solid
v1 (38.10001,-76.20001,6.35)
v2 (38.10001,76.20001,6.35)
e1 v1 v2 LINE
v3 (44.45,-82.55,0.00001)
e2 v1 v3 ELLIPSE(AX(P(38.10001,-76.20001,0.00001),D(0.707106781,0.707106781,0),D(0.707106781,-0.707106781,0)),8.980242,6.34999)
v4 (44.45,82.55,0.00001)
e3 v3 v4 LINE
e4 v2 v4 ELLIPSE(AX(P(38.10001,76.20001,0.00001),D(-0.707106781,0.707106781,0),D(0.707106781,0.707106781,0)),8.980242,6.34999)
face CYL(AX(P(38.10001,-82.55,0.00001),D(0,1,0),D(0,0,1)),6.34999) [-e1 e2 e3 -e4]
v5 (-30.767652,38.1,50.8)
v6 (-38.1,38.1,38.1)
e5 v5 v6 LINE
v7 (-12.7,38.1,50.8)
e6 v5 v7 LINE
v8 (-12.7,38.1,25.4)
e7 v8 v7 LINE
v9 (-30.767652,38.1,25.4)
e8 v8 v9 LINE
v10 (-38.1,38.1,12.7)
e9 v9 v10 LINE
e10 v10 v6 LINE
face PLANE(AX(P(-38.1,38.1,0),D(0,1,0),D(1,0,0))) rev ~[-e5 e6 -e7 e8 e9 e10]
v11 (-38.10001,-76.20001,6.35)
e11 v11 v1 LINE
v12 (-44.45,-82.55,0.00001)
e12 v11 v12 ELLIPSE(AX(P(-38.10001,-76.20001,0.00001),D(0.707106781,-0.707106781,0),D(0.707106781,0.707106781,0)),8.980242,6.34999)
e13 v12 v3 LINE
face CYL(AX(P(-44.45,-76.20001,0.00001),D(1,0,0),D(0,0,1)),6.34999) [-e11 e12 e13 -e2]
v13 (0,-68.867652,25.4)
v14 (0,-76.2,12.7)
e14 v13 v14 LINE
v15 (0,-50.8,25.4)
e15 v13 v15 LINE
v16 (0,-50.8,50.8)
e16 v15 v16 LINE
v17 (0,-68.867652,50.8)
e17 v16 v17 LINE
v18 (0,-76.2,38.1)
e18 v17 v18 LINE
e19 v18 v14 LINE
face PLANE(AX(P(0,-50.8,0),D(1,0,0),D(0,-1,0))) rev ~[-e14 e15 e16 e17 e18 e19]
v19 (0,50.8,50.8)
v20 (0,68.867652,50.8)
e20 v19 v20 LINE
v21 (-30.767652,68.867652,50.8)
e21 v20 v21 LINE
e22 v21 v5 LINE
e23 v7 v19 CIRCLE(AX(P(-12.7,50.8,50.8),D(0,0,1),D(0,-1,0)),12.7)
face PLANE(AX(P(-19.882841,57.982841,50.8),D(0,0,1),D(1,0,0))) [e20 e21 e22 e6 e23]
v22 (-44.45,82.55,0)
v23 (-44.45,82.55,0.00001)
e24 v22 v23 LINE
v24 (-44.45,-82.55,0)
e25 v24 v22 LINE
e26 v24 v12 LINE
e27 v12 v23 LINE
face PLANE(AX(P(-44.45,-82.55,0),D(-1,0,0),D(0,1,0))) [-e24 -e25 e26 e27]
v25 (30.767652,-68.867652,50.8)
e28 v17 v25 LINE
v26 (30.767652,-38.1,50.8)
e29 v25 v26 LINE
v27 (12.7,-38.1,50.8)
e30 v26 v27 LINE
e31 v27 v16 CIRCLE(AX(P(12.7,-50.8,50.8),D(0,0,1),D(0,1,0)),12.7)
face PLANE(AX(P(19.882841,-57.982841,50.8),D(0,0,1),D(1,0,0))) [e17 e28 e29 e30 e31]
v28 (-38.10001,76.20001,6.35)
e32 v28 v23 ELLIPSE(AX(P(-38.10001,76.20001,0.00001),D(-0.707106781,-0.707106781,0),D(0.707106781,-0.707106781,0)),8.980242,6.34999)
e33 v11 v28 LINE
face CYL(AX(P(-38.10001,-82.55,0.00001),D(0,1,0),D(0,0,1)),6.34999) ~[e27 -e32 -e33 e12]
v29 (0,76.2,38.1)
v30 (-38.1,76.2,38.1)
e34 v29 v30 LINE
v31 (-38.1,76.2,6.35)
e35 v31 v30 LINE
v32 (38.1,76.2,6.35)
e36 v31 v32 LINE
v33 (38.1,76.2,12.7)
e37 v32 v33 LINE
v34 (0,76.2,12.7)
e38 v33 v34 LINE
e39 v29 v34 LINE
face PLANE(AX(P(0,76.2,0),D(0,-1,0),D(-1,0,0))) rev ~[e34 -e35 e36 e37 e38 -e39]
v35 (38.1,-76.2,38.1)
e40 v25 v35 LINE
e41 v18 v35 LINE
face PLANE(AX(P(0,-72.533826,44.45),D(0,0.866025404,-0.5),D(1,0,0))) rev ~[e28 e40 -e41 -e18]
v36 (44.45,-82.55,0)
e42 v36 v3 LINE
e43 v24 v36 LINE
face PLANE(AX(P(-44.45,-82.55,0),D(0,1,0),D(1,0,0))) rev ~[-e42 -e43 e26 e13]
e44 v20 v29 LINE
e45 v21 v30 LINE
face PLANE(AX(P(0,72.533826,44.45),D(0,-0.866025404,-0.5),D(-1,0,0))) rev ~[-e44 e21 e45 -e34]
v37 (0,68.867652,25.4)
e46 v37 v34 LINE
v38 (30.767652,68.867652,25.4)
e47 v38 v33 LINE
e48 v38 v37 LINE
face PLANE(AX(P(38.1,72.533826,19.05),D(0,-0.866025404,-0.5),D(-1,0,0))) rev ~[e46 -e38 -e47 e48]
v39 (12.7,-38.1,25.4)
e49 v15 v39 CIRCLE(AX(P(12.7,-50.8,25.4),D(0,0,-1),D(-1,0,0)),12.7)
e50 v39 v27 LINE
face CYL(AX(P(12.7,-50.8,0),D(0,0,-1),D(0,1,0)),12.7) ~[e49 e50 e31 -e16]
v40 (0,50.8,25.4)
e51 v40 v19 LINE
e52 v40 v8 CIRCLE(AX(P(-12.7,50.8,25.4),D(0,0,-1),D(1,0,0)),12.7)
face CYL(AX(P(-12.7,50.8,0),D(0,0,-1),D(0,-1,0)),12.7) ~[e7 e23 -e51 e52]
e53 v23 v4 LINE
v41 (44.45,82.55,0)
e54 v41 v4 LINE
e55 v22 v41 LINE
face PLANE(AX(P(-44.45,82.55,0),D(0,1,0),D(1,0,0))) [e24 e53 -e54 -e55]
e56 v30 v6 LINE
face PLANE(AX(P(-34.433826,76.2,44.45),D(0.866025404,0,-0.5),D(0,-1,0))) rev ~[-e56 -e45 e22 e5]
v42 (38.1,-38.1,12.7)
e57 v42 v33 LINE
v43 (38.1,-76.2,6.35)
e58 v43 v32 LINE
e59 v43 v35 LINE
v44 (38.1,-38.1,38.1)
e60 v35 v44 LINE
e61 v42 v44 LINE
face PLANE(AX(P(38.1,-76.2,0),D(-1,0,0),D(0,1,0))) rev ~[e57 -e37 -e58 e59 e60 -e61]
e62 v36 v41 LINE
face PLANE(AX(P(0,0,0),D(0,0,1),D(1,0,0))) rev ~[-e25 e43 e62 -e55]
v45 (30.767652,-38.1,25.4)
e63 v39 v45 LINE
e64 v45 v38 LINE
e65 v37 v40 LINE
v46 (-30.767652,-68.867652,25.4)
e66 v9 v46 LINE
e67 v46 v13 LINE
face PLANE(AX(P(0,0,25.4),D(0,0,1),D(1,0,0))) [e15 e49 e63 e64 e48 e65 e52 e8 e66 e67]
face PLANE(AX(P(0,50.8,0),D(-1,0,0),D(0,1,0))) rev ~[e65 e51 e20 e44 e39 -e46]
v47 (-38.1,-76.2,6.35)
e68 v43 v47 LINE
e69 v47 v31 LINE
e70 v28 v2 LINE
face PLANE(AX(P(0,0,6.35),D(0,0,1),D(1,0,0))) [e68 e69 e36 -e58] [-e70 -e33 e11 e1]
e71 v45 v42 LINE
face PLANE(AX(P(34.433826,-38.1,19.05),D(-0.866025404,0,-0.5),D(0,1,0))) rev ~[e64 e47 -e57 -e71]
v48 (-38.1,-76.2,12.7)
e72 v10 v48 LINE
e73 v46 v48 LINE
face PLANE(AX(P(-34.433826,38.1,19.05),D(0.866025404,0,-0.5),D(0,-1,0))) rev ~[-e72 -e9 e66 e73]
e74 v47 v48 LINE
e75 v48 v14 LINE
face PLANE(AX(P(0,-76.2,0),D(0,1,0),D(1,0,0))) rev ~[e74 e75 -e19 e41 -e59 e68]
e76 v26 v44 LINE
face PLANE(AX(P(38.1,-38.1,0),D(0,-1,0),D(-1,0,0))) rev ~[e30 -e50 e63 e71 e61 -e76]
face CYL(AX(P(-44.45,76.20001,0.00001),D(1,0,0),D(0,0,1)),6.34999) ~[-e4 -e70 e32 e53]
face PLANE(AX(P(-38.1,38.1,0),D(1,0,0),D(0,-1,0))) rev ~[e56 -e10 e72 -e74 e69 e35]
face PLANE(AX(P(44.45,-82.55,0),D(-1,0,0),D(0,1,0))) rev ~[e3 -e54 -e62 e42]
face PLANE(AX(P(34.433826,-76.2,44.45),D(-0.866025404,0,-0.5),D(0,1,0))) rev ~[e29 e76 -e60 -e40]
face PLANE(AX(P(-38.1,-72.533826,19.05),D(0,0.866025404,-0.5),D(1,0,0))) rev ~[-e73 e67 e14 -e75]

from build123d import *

# Parameters (mm, degrees)
F0_W     = 88.9
F0_H     = 165.1
F1_DEPTH = 6.35
F2_DEPTH = 25.4
F3_DEPTH = 50.8
F4_SIZE2 = 12.7
F4_SIZE  = 7.3323484187
F5_R     = 6.34999
F6_SIZE2 = 12.7
F6_SIZE  = 7.3323484187
F7_SIZE2 = 12.7
F7_SIZE  = 7.3323484187


# Not quite as in the source:
# - a fillet or chamfer is up to 0.001 mm smaller than in the source, because OpenCascade refuses the exact size


with BuildPart() as f1:
    # F0 (on Top) → F1 (new body)
    with BuildSketch(Plane.XY):
        Rectangle(F0_W, F0_H)
        Polygon((-38.1, 38.1), (-38.1, 76.2), (0, 76.2), (38.1, 76.2), (38.1, -38.1), (38.1, -76.2), (0, -76.2), (-38.1, -76.2), align=None, mode=Mode.SUBTRACT)
    extrude(amount=F1_DEPTH)

    # F0 (on Top) → F2 (join)
    with BuildSketch(Plane.XY):
        with BuildLine():
            Line((38.1, 76.2), (0, 76.2))
            Line((0, 76.2), (0, 50.8))
            ThreePointArc((0, 50.8), (-3.7197438789, 41.8197438789), (-12.7, 38.1))
            Line((-12.7, 38.1), (-38.1, 38.1))
            Line((-38.1, 38.1), (-38.1, -76.2))
            Line((-38.1, -76.2), (0, -76.2))
            Line((0, -76.2), (0, -50.8))
            ThreePointArc((0, -50.8), (3.7197438789, -41.8197438789), (12.7, -38.1))
            Line((12.7, -38.1), (38.1, -38.1))
            Line((38.1, -38.1), (38.1, 76.2))
        make_face()
    extrude(amount=F2_DEPTH)

    # F0 (on Top) → F3 (join)
    with BuildSketch(Plane.XY):
        with BuildLine():
            Line((38.1, -76.2), (38.1, -38.1))
            Line((38.1, -38.1), (12.7, -38.1))
            ThreePointArc((12.7, -38.1), (3.7197438789, -41.8197438789), (0, -50.8))
            Line((0, -50.8), (0, -76.2))
            Line((0, -76.2), (38.1, -76.2))
        make_face()
        with BuildLine():
            Line((0, 76.2), (-38.1, 76.2))
            Line((-38.1, 76.2), (-38.1, 38.1))
            Line((-38.1, 38.1), (-12.7, 38.1))
            ThreePointArc((-12.7, 38.1), (-3.7197438789, 41.8197438789), (0, 50.8))
            Line((0, 50.8), (0, 76.2))
        make_face()
    extrude(amount=F3_DEPTH)

    # F4
    f4_edges = [f1.edges().sort_by_distance(p)[0] for p in [
        (19.05, -76.2, 50.8),
        (38.1, -57.15, 50.8),
    ]]
    f4_side = f1.faces().sort_by_distance((19.446042, -57.546042, 50.8))[0]
    chamfer(f4_edges, length=F4_SIZE, length2=F4_SIZE2, reference=f4_side)

    # F5 (radius 6.35 in the source; OpenCascade refuses exactly that, so slightly less here)
    f5_edges = [f1.edges().sort_by_distance(p)[0] for p in [
        (0, -82.55, 6.35),
        (44.45, 0, 6.35),
        (0, 82.55, 6.35),
        (-44.45, 0, 6.35),
    ]]
    fillet(f5_edges, radius=F5_R)

    # F6
    f6_edges = [f1.edges().sort_by_distance(p)[0] for p in [
        (-19.05, 76.2, 50.8),
        (-38.1, 57.15, 50.8),
    ]]
    f6_side = f1.faces().sort_by_distance((-19.446042, 57.546042, 50.8))[0]
    chamfer(f6_edges, length=F6_SIZE, length2=F6_SIZE2, reference=f6_side)

    # F7
    f7_edges = [f1.edges().sort_by_distance(p)[0] for p in [
        (38.1, 19.05, 25.4),
        (19.05, 76.2, 25.4),
        (-38.1, -19.05, 25.4),
        (-19.05, -76.2, 25.4),
    ]]
    f7_side = f1.faces().sort_by_distance((0, 0, 25.4))[0]
    chamfer(f7_edges, length=F7_SIZE, length2=F7_SIZE2, reference=f7_side)


solid = f1.part
